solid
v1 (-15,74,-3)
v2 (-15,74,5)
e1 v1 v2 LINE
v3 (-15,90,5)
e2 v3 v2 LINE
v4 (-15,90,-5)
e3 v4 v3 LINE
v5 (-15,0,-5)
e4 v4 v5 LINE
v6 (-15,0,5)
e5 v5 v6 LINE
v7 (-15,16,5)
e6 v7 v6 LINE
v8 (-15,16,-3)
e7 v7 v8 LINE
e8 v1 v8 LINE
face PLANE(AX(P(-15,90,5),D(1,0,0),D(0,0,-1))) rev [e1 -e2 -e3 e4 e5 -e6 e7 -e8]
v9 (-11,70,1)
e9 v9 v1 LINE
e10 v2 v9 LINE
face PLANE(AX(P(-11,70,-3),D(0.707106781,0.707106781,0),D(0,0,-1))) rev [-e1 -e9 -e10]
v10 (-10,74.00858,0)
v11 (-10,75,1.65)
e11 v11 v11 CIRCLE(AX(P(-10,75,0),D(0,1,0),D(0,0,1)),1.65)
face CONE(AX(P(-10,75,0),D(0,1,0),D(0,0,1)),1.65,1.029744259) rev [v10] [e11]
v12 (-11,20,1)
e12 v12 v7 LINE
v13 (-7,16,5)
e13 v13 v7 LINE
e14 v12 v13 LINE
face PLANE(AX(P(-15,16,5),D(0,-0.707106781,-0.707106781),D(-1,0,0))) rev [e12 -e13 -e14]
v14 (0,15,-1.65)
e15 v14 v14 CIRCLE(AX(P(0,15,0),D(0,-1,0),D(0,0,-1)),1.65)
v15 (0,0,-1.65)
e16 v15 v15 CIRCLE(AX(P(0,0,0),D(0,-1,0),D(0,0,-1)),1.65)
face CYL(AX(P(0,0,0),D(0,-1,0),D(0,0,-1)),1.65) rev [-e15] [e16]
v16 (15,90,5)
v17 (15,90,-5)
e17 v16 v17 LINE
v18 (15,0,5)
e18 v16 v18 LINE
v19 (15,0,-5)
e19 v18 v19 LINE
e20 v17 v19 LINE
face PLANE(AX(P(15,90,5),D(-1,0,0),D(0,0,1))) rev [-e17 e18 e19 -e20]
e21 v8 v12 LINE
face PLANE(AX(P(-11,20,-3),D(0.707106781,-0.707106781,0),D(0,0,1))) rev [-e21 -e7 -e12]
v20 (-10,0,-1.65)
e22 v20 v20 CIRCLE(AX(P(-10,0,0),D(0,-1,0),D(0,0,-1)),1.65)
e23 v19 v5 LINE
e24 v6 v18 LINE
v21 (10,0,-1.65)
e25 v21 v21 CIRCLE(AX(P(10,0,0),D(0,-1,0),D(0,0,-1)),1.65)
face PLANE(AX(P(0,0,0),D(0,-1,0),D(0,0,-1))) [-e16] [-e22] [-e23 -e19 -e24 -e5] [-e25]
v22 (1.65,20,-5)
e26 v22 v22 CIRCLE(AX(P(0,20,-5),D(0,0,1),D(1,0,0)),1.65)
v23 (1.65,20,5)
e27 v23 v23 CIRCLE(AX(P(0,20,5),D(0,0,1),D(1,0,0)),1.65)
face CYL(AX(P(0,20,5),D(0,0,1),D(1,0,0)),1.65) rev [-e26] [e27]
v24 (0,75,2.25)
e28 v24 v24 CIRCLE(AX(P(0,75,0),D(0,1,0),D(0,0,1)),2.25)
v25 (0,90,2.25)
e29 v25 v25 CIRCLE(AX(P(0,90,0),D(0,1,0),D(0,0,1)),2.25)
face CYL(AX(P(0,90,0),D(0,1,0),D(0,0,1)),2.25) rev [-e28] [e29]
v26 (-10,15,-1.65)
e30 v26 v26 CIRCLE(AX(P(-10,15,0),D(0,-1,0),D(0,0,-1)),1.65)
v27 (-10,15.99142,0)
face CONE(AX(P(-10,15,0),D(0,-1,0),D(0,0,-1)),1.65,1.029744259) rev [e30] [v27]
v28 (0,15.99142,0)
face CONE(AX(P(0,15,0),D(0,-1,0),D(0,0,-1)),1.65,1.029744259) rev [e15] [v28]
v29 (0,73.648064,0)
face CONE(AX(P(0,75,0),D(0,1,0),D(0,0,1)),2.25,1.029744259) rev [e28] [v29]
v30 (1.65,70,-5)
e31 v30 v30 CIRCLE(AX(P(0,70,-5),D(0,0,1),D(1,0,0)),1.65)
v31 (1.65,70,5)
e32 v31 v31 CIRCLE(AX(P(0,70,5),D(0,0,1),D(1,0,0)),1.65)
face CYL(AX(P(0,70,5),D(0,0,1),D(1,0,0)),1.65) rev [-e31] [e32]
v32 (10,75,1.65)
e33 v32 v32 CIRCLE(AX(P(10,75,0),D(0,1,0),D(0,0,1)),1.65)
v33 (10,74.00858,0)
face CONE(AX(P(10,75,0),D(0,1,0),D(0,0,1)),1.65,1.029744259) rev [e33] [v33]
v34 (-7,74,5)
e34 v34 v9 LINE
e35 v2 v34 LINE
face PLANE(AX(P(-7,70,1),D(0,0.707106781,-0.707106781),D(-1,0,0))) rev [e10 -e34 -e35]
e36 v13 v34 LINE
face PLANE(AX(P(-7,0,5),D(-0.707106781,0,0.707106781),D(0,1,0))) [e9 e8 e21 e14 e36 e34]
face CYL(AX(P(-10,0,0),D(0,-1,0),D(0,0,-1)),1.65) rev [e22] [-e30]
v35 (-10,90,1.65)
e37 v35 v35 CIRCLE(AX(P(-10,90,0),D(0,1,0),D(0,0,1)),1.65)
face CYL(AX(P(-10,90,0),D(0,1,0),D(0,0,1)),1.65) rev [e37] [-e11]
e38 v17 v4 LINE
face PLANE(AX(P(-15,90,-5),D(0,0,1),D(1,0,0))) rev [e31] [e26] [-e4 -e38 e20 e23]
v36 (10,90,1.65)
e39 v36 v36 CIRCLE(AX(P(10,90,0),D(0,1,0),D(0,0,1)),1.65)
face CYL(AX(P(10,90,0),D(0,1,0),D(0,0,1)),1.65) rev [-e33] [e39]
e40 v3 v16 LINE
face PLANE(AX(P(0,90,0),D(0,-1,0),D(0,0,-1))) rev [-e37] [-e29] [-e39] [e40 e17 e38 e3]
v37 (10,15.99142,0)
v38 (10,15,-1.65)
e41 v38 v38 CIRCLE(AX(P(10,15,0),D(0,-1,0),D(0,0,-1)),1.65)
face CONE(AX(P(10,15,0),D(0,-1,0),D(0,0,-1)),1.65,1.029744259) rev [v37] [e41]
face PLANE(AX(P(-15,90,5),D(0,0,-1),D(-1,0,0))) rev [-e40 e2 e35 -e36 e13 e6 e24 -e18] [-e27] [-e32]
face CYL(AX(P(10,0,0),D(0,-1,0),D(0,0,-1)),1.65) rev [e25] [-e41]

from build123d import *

# Parameters (mm, degrees)
SKETCH1_W                 = 30
SKETCH1_H                 = 10
BOSS_EXTRUDE1_DEPTH       = 90
M4X0_7_TAPPED_HOLE1_D     = 3.3
M4X0_7_TAPPED_HOLE1_DEPTH = 15
M4X0_7_TAPPED_HOLE1_TIP   = 0.991420021
M4X0_7_TAPPED_HOLE2_D     = 3.3
M4X0_7_TAPPED_HOLE2_DEPTH = 15
M4X0_7_TAPPED_HOLE2_TIP   = 0.991420021
M4X0_7_TAPPED_HOLE3_D     = 3.3
M4_CLEARANCE_HOLE1_D      = 4.5
M4_CLEARANCE_HOLE1_DEPTH  = 15
M4_CLEARANCE_HOLE1_TIP    = 1.351936393
SKETCH13_W                = 8
SKETCH13_H                = 50
CUT_EXTRUDE1_DEPTH        = 8
CHAMFER4_SIZE             = 8
CHAMFER5_SIZE             = 4


# Some blends are built 0.0001 mm under size
with BuildPart() as part:
    # Sketch1 → Boss-Extrude1 (new body)
    with BuildSketch(Plane(origin=(0, 0, 0), x_dir=(1, 0, 0), z_dir=(0, 1, 0))):
        Rectangle(SKETCH1_W, SKETCH1_H)
    extrude(amount=BOSS_EXTRUDE1_DEPTH)

    # M4x0.7 Tapped Hole1
    with Locations(Plane(origin=(0, 0, 0), x_dir=(-1, 0, 0), z_dir=(0, -1, 0))):
        with Locations((-10, 0), (10, 0), (0, 0)):
            Hole(M4X0_7_TAPPED_HOLE1_D / 2, depth=M4X0_7_TAPPED_HOLE1_DEPTH)
            with Locations((0, 0, -(M4X0_7_TAPPED_HOLE1_DEPTH + M4X0_7_TAPPED_HOLE1_TIP / 2))):  # 118° drill point
                Cone(0, M4X0_7_TAPPED_HOLE1_D / 2, M4X0_7_TAPPED_HOLE1_TIP, mode=Mode.SUBTRACT)

    # M4x0.7 Tapped Hole2
    with Locations(Plane(origin=(0, 90, 0), x_dir=(1, 0, 0), z_dir=(0, 1, 0))):
        with Locations((-10, 0), (10, 0)):
            Hole(M4X0_7_TAPPED_HOLE2_D / 2, depth=M4X0_7_TAPPED_HOLE2_DEPTH)
            with Locations((0, 0, -(M4X0_7_TAPPED_HOLE2_DEPTH + M4X0_7_TAPPED_HOLE2_TIP / 2))):  # 118° drill point
                Cone(0, M4X0_7_TAPPED_HOLE2_D / 2, M4X0_7_TAPPED_HOLE2_TIP, mode=Mode.SUBTRACT)

    # M4x0.7 Tapped Hole3 (through all)
    with Locations(Plane.XY.offset(5)):
        with Locations((0, 70), (0, 20)):
            Hole(M4X0_7_TAPPED_HOLE3_D / 2)

    # M4 Clearance Hole1
    with Locations(Plane(origin=(0, 90, 0), x_dir=(1, 0, 0), z_dir=(0, 1, 0))):
        with Locations((0, 0)):
            Hole(M4_CLEARANCE_HOLE1_D / 2, depth=M4_CLEARANCE_HOLE1_DEPTH)
            with Locations((0, 0, -(M4_CLEARANCE_HOLE1_DEPTH + M4_CLEARANCE_HOLE1_TIP / 2))):  # 118° drill point
                Cone(0, M4_CLEARANCE_HOLE1_D / 2, M4_CLEARANCE_HOLE1_TIP, mode=Mode.SUBTRACT)

    # Sketch13 → Cut-Extrude1 (cut)
    with BuildSketch(Plane.ZY.offset(15)):
        with Locations((1, 45)):
            Rectangle(SKETCH13_W, SKETCH13_H)
    extrude(amount=-CUT_EXTRUDE1_DEPTH, mode=Mode.SUBTRACT)

    # Chamfer4
    chamfer4_edges = [part.edges().sort_by_distance(p)[0] for p in [
        (-7, 45, -3),
    ]]
    chamfer(chamfer4_edges, length=CHAMFER4_SIZE - 0.0001)  # a hair under: the kernel refuses the full size

    # Chamfer5
    # the kernel refuses this chamfer: 4 mm, written as the material it takes off along each edge
    with BuildSketch(Plane(origin=(-25.286731952, 20, 5), x_dir=(0, -0.9996219169112968, 0.02749587661058627), z_dir=(1, 0, 0))) as chamfer5_piece_1_section:
        Polygon((CHAMFER5_SIZE * 0.999621916911, CHAMFER5_SIZE * 0.0274958766106), (-CHAMFER5_SIZE * 0.0274958766106, CHAMFER5_SIZE * 0.999621916911), (0, 0), align=None)
    chamfer5_piece_1 = extrude(amount=18.286731952, mode=Mode.PRIVATE)
    chamfer5_piece_1 = split(chamfer5_piece_1, bisect_by=Plane(origin=(-9.899926501, 18.600001, 2.099973499), z_dir=(-0.7071067811865476, 0, 0.7071067811865476)), keep=Keep.TOP, mode=Mode.PRIVATE)
    add(chamfer5_piece_1, mode=Mode.SUBTRACT)
    with BuildSketch(Plane(origin=(-15, 20, -3), x_dir=(-0.027495876610586487, -0.9996219169112968, 0), z_dir=(0, 0, 1))) as chamfer5_piece_2_section:
        Polygon((CHAMFER5_SIZE * 0.999621916911, CHAMFER5_SIZE * 0.0274958766106), (-CHAMFER5_SIZE * 0.0274958766106, CHAMFER5_SIZE * 0.999621916911), (0, 0), align=None)
    chamfer5_piece_2 = extrude(amount=18.286731952, mode=Mode.PRIVATE)
    chamfer5_piece_2 = split(chamfer5_piece_2, bisect_by=Plane(origin=(-12.099973499, 18.600001, -0.100073499), z_dir=(-0.7071067811865476, 0, 0.7071067811865476)), keep=Keep.TOP, mode=Mode.PRIVATE)
    add(chamfer5_piece_2, mode=Mode.SUBTRACT)
    with BuildSketch(Plane(origin=(-25.286731952, 70, 5), x_dir=(0, -0.027495876610585623, -0.9996219169112968), z_dir=(1, 0, 0))) as chamfer5_piece_3_section:
        Polygon((CHAMFER5_SIZE * 0.999621916911, CHAMFER5_SIZE * 0.0274958766106), (-CHAMFER5_SIZE * 0.0274958766106, CHAMFER5_SIZE * 0.999621916911), (0, 0), align=None)
    chamfer5_piece_3 = extrude(amount=18.286731952, mode=Mode.PRIVATE)
    chamfer5_piece_3 = split(chamfer5_piece_3, bisect_by=Plane(origin=(-9.899926501, 71.399999, 2.099973499), z_dir=(-0.7071067811865476, 0, 0.7071067811865476)), keep=Keep.TOP, mode=Mode.PRIVATE)
    add(chamfer5_piece_3, mode=Mode.SUBTRACT)
    with BuildSketch(Plane(origin=(-15, 70, 15.286731952), x_dir=(0.9996219169112968, -0.027495876610585623, 0), z_dir=(0, 0, -1))) as chamfer5_piece_4_section:
        Polygon((CHAMFER5_SIZE * 0.999621916911, -CHAMFER5_SIZE * 0.0274958766106), (-CHAMFER5_SIZE * 0.0274958766106, -CHAMFER5_SIZE * 0.999621916911), (0, 0), align=None)
    chamfer5_piece_4 = extrude(amount=18.286731952, mode=Mode.PRIVATE)
    chamfer5_piece_4 = split(chamfer5_piece_4, bisect_by=Plane(origin=(-12.099973499, 71.399999, -0.100073499), z_dir=(-0.7071067811865476, 0, 0.7071067811865476)), keep=Keep.TOP, mode=Mode.PRIVATE)
    add(chamfer5_piece_4, mode=Mode.SUBTRACT)


solid = part.part
